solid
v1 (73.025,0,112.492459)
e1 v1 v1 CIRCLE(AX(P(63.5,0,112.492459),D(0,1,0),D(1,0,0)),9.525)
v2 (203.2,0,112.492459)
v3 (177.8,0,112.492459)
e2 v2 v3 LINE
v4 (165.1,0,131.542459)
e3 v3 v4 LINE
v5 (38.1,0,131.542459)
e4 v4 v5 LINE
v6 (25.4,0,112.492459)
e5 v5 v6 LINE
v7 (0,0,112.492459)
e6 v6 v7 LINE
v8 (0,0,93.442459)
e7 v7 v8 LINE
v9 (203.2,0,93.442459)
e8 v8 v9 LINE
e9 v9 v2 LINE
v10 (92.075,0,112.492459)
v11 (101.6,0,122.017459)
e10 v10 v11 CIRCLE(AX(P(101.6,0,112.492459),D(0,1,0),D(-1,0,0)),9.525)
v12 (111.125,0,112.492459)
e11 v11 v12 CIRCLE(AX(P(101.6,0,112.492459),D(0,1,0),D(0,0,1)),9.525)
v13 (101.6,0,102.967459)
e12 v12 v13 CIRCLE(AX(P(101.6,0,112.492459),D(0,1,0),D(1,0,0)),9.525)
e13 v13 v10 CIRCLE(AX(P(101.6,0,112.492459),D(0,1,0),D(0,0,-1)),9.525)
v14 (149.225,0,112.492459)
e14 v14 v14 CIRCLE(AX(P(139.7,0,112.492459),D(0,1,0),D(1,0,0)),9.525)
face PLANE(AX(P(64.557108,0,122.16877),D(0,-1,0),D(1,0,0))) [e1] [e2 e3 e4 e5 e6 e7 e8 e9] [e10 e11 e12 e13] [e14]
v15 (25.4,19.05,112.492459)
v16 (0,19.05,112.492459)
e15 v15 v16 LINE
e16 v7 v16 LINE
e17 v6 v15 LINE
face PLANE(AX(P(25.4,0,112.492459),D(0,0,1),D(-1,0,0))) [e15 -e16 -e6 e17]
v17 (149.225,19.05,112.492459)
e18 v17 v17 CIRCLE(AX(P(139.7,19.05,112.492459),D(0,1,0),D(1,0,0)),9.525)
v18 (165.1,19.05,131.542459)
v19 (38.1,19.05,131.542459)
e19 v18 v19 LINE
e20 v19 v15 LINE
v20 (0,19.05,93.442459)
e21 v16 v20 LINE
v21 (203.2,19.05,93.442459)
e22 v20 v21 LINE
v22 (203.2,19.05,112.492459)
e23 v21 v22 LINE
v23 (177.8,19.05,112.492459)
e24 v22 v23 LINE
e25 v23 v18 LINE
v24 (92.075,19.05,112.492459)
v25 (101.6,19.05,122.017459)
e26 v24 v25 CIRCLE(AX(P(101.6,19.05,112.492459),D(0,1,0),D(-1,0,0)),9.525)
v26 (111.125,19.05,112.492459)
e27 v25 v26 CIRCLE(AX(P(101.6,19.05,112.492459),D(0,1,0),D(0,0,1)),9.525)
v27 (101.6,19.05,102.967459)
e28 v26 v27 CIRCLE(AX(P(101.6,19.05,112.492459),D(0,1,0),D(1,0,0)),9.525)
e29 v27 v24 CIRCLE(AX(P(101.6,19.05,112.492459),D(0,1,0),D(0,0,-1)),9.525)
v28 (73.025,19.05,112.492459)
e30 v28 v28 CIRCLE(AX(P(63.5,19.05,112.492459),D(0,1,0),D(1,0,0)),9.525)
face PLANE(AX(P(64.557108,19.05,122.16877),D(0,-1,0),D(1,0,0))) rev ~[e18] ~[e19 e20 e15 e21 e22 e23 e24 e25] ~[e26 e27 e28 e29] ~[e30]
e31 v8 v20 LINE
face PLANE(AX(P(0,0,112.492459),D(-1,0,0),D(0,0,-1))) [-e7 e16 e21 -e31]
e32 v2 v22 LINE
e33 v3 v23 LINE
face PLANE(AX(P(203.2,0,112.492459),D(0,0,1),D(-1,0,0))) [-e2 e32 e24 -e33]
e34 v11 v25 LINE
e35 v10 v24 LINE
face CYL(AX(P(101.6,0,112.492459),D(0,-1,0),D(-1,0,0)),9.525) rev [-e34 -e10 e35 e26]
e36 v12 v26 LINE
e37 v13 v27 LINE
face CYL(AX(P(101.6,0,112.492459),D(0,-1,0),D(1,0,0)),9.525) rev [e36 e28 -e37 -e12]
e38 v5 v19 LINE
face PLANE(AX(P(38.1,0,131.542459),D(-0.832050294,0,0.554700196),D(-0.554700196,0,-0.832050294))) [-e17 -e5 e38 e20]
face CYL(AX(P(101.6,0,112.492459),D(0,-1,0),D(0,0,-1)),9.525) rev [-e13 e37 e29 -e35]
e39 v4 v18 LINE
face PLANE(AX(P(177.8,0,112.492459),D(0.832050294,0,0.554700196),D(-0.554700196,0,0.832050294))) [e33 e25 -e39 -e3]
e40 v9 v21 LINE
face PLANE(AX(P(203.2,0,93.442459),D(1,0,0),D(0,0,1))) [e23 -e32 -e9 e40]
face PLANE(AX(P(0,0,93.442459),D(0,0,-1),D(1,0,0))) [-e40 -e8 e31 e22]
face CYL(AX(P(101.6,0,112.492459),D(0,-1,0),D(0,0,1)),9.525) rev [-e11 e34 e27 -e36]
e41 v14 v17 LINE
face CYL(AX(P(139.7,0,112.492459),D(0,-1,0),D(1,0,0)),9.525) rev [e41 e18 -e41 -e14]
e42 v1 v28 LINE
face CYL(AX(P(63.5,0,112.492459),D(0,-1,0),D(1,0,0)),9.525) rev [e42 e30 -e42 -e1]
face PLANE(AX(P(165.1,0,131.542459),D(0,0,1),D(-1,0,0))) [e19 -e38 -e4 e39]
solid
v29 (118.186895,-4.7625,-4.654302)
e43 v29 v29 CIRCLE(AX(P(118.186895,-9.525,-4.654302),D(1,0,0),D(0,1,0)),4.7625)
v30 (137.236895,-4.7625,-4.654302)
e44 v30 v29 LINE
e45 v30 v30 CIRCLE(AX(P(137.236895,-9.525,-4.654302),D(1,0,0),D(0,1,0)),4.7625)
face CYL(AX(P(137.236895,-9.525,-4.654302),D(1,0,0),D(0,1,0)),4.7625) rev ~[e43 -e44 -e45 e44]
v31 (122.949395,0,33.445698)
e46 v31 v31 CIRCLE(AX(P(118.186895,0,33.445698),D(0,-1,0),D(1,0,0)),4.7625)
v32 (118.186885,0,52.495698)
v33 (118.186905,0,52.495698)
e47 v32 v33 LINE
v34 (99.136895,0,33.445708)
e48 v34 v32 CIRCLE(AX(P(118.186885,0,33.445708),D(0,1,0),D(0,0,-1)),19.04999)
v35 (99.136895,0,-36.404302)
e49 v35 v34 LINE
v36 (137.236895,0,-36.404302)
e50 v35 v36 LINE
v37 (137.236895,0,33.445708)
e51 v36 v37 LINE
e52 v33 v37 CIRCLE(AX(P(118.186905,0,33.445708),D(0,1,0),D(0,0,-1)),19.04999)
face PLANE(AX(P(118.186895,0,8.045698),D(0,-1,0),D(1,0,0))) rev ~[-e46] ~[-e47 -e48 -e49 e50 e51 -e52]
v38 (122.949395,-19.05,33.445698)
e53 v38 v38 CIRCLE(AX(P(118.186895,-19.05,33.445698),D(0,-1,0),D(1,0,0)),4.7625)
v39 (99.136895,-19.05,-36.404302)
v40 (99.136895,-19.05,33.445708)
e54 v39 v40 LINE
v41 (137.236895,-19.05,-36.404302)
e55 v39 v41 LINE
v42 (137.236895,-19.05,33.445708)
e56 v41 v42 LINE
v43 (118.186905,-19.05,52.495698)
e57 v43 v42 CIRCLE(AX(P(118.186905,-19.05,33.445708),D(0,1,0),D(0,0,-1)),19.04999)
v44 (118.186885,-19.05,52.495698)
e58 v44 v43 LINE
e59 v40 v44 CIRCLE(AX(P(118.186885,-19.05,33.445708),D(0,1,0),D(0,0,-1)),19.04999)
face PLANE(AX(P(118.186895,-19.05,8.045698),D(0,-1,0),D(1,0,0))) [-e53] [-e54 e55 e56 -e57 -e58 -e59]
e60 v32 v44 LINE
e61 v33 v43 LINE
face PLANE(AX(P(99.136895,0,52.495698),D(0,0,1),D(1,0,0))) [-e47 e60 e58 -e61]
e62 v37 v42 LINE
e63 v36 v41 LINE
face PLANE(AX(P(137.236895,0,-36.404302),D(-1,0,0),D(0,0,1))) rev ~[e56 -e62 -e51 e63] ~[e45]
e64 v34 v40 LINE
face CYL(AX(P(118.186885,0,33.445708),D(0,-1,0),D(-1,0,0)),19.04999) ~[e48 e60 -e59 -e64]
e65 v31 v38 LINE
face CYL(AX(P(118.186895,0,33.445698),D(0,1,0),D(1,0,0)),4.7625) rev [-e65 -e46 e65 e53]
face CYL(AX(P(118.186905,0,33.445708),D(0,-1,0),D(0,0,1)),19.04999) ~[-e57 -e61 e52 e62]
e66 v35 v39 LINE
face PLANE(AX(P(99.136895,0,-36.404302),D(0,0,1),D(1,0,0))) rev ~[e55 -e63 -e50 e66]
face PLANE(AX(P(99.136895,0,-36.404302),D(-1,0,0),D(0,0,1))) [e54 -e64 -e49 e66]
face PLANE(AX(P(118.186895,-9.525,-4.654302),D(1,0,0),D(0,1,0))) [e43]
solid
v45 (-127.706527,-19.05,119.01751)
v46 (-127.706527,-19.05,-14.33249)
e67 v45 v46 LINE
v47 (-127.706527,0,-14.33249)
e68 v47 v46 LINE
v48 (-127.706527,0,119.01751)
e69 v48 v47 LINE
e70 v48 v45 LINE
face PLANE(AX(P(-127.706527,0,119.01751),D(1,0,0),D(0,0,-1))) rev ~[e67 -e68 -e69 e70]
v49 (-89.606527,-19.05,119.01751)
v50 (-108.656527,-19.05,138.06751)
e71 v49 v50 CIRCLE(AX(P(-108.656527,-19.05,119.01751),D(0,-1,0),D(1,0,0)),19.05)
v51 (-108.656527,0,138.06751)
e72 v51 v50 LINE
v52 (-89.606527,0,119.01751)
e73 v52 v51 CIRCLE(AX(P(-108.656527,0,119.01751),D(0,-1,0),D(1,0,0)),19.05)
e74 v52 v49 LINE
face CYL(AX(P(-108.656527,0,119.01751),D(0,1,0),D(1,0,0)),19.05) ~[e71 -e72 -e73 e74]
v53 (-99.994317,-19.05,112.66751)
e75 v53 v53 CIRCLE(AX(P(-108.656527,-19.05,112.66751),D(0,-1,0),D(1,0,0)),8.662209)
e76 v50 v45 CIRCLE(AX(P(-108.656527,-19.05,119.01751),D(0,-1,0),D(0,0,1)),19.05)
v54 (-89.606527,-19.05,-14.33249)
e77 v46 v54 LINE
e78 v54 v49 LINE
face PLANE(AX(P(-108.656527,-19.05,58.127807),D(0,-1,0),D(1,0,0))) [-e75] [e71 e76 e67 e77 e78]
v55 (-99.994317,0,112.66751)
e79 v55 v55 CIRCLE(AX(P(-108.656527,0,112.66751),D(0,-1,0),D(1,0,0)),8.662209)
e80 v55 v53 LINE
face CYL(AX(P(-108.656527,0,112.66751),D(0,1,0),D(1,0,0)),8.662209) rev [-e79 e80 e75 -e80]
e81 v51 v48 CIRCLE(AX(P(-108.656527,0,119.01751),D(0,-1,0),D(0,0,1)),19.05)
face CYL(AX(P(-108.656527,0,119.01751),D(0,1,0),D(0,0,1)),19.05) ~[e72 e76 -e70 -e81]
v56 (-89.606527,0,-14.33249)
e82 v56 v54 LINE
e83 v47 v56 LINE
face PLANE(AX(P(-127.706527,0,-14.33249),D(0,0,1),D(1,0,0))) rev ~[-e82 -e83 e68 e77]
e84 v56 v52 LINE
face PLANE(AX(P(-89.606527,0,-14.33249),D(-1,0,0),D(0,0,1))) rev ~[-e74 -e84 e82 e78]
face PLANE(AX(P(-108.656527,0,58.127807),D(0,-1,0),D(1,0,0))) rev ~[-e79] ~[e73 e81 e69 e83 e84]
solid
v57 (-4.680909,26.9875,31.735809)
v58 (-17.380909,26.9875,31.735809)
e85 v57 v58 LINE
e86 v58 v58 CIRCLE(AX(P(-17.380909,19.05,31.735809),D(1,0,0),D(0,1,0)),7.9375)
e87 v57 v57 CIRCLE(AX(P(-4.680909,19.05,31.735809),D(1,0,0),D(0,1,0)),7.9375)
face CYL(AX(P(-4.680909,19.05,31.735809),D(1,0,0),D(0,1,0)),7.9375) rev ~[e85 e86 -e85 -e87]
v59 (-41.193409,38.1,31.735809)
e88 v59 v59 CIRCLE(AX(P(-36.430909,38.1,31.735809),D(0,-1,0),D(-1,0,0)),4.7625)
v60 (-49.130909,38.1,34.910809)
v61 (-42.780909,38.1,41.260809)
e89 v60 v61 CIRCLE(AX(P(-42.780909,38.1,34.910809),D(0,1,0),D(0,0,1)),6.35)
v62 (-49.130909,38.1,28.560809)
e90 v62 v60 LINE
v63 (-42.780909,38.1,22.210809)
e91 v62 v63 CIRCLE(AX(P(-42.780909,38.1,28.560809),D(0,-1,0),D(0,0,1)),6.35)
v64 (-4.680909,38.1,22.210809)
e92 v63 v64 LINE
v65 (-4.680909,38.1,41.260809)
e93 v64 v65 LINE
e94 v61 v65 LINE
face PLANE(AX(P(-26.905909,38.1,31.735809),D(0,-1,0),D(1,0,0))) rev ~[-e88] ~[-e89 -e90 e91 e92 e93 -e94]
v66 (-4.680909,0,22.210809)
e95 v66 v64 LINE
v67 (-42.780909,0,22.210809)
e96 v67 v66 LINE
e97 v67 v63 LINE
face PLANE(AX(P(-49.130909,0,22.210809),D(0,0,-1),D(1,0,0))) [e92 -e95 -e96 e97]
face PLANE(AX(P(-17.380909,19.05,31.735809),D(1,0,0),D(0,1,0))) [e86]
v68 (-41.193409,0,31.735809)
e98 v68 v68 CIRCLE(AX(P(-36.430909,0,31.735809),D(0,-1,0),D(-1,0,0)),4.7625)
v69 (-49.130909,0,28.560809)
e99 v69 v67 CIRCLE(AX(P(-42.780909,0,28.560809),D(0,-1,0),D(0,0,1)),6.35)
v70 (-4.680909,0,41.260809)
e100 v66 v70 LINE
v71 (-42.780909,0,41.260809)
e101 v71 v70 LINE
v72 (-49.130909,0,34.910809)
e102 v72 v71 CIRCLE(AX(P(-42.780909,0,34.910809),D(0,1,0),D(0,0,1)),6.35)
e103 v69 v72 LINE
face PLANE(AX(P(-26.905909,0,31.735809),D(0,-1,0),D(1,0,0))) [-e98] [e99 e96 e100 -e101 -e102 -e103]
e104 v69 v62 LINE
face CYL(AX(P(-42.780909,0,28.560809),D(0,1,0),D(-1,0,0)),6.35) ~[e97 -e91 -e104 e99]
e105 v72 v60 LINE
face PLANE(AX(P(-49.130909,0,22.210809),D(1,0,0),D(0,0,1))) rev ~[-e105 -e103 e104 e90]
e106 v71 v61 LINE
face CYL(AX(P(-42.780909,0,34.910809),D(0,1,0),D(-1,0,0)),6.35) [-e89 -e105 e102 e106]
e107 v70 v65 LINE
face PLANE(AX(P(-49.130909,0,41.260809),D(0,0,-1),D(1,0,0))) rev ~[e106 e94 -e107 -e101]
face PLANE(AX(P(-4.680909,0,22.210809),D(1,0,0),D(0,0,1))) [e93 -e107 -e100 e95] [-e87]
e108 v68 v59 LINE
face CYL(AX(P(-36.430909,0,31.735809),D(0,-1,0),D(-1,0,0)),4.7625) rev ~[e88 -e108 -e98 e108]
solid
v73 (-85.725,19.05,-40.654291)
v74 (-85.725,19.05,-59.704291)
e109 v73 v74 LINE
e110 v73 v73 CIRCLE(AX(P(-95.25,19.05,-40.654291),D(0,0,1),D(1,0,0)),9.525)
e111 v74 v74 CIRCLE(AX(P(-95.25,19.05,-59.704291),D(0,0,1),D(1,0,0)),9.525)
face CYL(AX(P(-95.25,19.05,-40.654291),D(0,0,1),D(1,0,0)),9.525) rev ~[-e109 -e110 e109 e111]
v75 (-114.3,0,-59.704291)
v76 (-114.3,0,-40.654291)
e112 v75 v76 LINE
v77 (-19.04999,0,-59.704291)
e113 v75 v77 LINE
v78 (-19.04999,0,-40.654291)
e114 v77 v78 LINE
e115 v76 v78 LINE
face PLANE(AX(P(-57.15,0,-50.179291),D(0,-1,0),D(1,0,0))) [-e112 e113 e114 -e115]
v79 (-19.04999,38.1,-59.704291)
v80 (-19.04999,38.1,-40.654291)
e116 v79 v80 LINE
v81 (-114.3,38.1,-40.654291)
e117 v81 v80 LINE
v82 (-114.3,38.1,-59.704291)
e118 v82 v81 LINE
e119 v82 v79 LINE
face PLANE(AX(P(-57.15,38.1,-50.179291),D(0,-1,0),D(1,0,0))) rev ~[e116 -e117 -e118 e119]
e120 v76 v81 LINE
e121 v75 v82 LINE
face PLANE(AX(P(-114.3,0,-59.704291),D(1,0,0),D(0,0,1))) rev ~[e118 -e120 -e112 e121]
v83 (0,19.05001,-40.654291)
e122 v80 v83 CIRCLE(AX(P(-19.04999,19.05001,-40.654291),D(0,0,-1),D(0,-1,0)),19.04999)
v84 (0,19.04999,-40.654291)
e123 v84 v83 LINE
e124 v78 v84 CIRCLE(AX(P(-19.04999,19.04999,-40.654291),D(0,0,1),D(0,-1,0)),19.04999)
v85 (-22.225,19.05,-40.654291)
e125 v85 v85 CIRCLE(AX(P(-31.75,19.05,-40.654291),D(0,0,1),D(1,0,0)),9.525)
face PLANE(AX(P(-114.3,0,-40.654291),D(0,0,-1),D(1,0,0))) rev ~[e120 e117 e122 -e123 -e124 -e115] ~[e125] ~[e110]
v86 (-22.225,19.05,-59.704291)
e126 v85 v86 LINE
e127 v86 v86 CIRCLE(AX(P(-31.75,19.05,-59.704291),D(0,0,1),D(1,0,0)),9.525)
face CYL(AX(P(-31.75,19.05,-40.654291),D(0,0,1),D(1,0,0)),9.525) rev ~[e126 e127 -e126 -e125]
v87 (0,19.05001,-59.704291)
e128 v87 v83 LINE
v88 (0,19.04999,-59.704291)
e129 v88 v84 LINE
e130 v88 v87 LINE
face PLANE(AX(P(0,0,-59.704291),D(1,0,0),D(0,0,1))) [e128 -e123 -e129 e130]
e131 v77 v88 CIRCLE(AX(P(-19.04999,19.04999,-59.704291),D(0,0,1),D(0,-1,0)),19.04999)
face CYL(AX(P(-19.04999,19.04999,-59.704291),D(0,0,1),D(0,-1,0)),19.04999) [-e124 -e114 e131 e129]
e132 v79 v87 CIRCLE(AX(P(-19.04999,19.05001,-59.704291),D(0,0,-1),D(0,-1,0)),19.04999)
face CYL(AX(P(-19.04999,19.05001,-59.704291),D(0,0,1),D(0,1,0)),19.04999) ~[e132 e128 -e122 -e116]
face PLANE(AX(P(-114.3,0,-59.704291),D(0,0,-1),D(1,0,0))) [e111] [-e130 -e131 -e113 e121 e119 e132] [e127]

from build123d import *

# Parameters (mm, degrees)
F0_W      = 44.45
F0_H      = 19.05
F1_DEPTH  = 38.1
F3_DEPTH  = 43.18
F4_R      = 7.9375
F5_DEPTH  = 12.7
F6_R      = 6.35
F7_W      = 38.1
F7_H      = 88.9
F7_R      = 4.7625
F8_DEPTH  = 19.05
F9_R      = 4.7625
F10_DEPTH = 19.05
F11_R     = 19.04999
F12_W     = 114.3
F12_H     = 19.05
F13_DEPTH = 38.1
F14_R     = 9.525
F15_DEPTH = 101.6
F16_R     = 19.04999
F17_R     = 8.6622092444
F18_DEPTH = 19.05
F20_DEPTH = 19.05


# Not quite as in the source:
# - a fillet or chamfer is up to 0.001 mm smaller than in the source, because OpenCascade refuses the exact size


with BuildPart() as f1:
    # F0 (on Front) → F1 (new body)
    with BuildSketch(Plane.XZ):
        with Locations((-26.9059087763, 31.7358085886)):
            Rectangle(F0_W, F0_H)
    extrude(amount=-F1_DEPTH)

    # F2 (on face) → F3 (cut)
    with BuildSketch(Plane.XZ):
        with BuildLine():
            ThreePointArc((-31.6684087763, 31.7358085886), (-36.4309087763, 36.4983085886), (-41.1934087763, 31.7358085886))
            Line((-41.1934087763, 31.7358085886), (-31.6684087763, 31.7358085886))
        make_face()
        with BuildLine():
            Line((-31.6684087763, 31.7358085886), (-41.1934087763, 31.7358085886))
            ThreePointArc((-41.1934087763, 31.7358085886), (-36.4309087763, 26.9733085886), (-31.6684087763, 31.7358085886))
        make_face()
    extrude(amount=-F3_DEPTH, mode=Mode.SUBTRACT)

    # F4 (on face) → F5 (cut)
    with BuildSketch(Plane.YZ.offset(-4.6809087763)):
        with Locations((19.05, 31.7358085886)):
            Circle(F4_R)
    extrude(amount=-F5_DEPTH, mode=Mode.SUBTRACT)

    # F6
    f6_edges = [f1.edges().sort_by_distance(p)[0] for p in [
        (-49.130909, 19.05, 41.260809),
        (-49.130909, 19.05, 22.210809),
    ]]
    fillet(f6_edges, radius=F6_R)


with BuildPart() as f8:
    # F7 (on Front) → F8 (new body)
    with BuildSketch(Plane.XZ):
        with Locations((118.1868945239, 8.0456975847)):
            Rectangle(F7_W, F7_H)
        with Locations((118.1868945239, 33.4456975847)):
            Circle(F7_R, mode=Mode.SUBTRACT)
    extrude(amount=F8_DEPTH)

    # F9 (on face) → F10 (cut)
    with BuildSketch(Plane.YZ.offset(137.2368945239)):
        with Locations((-9.525, -4.6543024153)):
            Circle(F9_R)
    extrude(amount=-F10_DEPTH, mode=Mode.SUBTRACT)

    # F11 (radius 19.05 in the source; OpenCascade refuses exactly that, so slightly less here)
    f11_edges = [f8.edges().sort_by_distance(p)[0] for p in [
        (137.236895, -9.525, 52.495698),
        (99.136895, -9.525, 52.495698),
    ]]
    fillet(f11_edges, radius=F11_R)


with BuildPart() as f13:
    # F12 (on Front) → F13 (new body)
    with BuildSketch(Plane.XZ):
        with Locations((-57.15, -50.1792910555)):
            Rectangle(F12_W, F12_H)
    extrude(amount=-F13_DEPTH)

    # F14 (on face) → F15 (cut)
    with BuildSketch(Plane.XY.offset(-40.6542910555)):
        with Locations((-95.25, 19.05)):
            Circle(F14_R)
        with Locations((-31.75, 19.05)):
            Circle(F14_R)
    extrude(amount=-F15_DEPTH, mode=Mode.SUBTRACT)

    # F16 (radius 19.05 in the source; OpenCascade refuses exactly that, so slightly less here)
    f16_edges = [f13.edges().sort_by_distance(p)[0] for p in [
        (0, 38.1, -50.179291),
        (0, 0, -50.179291),
    ]]
    fillet(f16_edges, radius=F16_R)


with BuildPart() as f18:
    # F17 (on Front) → F18 (new body)
    with BuildSketch(Plane.XZ):
        with BuildLine():
            Line((-127.7065266967, 119.0175100861), (-127.7065266967, -14.3324899139))
            Line((-127.7065266967, -14.3324899139), (-89.6065266967, -14.3324899139))
            Line((-89.6065266967, -14.3324899139), (-89.6065266967, 119.0175100861))
            ThreePointArc((-89.6065266967, 119.0175100861), (-95.1861425151, 132.4878942677), (-108.6565266967, 138.0675100861))
            ThreePointArc((-108.6565266967, 138.0675100861), (-122.1269108783, 132.4878942677), (-127.7065266967, 119.0175100861))
        make_face()
        with Locations((-108.6565266967, 112.6675100861)):
            Circle(F17_R, mode=Mode.SUBTRACT)
    extrude(amount=F18_DEPTH)


with BuildPart() as f20:
    # F19 (on Front) → F20 (new body)
    with BuildSketch(Plane.XZ):
        with BuildLine():
            Line((101.6, 131.5424591149), (38.1, 131.5424591149))
            Line((38.1, 131.5424591149), (25.4, 112.4924591149))
            Line((25.4, 112.4924591149), (53.975, 112.4924591149))
            ThreePointArc((53.975, 112.4924591149), (63.5, 122.0174591149), (73.025, 112.4924591149))
            Line((73.025, 112.4924591149), (92.075, 112.4924591149))
            ThreePointArc((92.075, 112.4924591149), (94.8648079092, 119.2276512057), (101.6, 122.0174591149))
            Line((101.6, 122.0174591149), (101.6, 131.5424591149))
        make_face()
        with BuildLine():
            Line((165.1, 131.5424591149), (101.6, 131.5424591149))
            Line((101.6, 131.5424591149), (101.6, 122.0174591149))
            ThreePointArc((101.6, 122.0174591149), (108.3351920908, 119.2276512057), (111.125, 112.4924591149))
            Line((111.125, 112.4924591149), (130.175, 112.4924591149))
            ThreePointArc((130.175, 112.4924591149), (139.7, 122.0174591149), (149.225, 112.4924591149))
            Line((149.225, 112.4924591149), (177.8, 112.4924591149))
            Line((177.8, 112.4924591149), (165.1, 131.5424591149))
        make_face()
        with BuildLine():
            Line((53.975, 112.4924591149), (25.4, 112.4924591149))
            Line((25.4, 112.4924591149), (0, 112.4924591149))
            Line((0, 112.4924591149), (0, 93.4424591149))
            Line((0, 93.4424591149), (101.6, 93.4424591149))
            Line((101.6, 93.4424591149), (101.6, 102.9674591149))
            ThreePointArc((101.6, 102.9674591149), (94.8648079092, 105.7572670241), (92.075, 112.4924591149))
            Line((92.075, 112.4924591149), (73.025, 112.4924591149))
            ThreePointArc((73.025, 112.4924591149), (63.5, 102.9674591149), (53.975, 112.4924591149))
        make_face()
        with BuildLine():
            Line((203.2, 112.4924591149), (177.8, 112.4924591149))
            Line((177.8, 112.4924591149), (149.225, 112.4924591149))
            ThreePointArc((149.225, 112.4924591149), (139.7, 102.9674591149), (130.175, 112.4924591149))
            Line((130.175, 112.4924591149), (111.125, 112.4924591149))
            ThreePointArc((111.125, 112.4924591149), (108.3351920908, 105.7572670241), (101.6, 102.9674591149))
            Line((101.6, 102.9674591149), (101.6, 93.4424591149))
            Line((101.6, 93.4424591149), (203.2, 93.4424591149))
            Line((203.2, 93.4424591149), (203.2, 112.4924591149))
        make_face()
    extrude(amount=-F20_DEPTH)


solid = Compound([f1.part, f8.part, f13.part, f18.part, f20.part])
